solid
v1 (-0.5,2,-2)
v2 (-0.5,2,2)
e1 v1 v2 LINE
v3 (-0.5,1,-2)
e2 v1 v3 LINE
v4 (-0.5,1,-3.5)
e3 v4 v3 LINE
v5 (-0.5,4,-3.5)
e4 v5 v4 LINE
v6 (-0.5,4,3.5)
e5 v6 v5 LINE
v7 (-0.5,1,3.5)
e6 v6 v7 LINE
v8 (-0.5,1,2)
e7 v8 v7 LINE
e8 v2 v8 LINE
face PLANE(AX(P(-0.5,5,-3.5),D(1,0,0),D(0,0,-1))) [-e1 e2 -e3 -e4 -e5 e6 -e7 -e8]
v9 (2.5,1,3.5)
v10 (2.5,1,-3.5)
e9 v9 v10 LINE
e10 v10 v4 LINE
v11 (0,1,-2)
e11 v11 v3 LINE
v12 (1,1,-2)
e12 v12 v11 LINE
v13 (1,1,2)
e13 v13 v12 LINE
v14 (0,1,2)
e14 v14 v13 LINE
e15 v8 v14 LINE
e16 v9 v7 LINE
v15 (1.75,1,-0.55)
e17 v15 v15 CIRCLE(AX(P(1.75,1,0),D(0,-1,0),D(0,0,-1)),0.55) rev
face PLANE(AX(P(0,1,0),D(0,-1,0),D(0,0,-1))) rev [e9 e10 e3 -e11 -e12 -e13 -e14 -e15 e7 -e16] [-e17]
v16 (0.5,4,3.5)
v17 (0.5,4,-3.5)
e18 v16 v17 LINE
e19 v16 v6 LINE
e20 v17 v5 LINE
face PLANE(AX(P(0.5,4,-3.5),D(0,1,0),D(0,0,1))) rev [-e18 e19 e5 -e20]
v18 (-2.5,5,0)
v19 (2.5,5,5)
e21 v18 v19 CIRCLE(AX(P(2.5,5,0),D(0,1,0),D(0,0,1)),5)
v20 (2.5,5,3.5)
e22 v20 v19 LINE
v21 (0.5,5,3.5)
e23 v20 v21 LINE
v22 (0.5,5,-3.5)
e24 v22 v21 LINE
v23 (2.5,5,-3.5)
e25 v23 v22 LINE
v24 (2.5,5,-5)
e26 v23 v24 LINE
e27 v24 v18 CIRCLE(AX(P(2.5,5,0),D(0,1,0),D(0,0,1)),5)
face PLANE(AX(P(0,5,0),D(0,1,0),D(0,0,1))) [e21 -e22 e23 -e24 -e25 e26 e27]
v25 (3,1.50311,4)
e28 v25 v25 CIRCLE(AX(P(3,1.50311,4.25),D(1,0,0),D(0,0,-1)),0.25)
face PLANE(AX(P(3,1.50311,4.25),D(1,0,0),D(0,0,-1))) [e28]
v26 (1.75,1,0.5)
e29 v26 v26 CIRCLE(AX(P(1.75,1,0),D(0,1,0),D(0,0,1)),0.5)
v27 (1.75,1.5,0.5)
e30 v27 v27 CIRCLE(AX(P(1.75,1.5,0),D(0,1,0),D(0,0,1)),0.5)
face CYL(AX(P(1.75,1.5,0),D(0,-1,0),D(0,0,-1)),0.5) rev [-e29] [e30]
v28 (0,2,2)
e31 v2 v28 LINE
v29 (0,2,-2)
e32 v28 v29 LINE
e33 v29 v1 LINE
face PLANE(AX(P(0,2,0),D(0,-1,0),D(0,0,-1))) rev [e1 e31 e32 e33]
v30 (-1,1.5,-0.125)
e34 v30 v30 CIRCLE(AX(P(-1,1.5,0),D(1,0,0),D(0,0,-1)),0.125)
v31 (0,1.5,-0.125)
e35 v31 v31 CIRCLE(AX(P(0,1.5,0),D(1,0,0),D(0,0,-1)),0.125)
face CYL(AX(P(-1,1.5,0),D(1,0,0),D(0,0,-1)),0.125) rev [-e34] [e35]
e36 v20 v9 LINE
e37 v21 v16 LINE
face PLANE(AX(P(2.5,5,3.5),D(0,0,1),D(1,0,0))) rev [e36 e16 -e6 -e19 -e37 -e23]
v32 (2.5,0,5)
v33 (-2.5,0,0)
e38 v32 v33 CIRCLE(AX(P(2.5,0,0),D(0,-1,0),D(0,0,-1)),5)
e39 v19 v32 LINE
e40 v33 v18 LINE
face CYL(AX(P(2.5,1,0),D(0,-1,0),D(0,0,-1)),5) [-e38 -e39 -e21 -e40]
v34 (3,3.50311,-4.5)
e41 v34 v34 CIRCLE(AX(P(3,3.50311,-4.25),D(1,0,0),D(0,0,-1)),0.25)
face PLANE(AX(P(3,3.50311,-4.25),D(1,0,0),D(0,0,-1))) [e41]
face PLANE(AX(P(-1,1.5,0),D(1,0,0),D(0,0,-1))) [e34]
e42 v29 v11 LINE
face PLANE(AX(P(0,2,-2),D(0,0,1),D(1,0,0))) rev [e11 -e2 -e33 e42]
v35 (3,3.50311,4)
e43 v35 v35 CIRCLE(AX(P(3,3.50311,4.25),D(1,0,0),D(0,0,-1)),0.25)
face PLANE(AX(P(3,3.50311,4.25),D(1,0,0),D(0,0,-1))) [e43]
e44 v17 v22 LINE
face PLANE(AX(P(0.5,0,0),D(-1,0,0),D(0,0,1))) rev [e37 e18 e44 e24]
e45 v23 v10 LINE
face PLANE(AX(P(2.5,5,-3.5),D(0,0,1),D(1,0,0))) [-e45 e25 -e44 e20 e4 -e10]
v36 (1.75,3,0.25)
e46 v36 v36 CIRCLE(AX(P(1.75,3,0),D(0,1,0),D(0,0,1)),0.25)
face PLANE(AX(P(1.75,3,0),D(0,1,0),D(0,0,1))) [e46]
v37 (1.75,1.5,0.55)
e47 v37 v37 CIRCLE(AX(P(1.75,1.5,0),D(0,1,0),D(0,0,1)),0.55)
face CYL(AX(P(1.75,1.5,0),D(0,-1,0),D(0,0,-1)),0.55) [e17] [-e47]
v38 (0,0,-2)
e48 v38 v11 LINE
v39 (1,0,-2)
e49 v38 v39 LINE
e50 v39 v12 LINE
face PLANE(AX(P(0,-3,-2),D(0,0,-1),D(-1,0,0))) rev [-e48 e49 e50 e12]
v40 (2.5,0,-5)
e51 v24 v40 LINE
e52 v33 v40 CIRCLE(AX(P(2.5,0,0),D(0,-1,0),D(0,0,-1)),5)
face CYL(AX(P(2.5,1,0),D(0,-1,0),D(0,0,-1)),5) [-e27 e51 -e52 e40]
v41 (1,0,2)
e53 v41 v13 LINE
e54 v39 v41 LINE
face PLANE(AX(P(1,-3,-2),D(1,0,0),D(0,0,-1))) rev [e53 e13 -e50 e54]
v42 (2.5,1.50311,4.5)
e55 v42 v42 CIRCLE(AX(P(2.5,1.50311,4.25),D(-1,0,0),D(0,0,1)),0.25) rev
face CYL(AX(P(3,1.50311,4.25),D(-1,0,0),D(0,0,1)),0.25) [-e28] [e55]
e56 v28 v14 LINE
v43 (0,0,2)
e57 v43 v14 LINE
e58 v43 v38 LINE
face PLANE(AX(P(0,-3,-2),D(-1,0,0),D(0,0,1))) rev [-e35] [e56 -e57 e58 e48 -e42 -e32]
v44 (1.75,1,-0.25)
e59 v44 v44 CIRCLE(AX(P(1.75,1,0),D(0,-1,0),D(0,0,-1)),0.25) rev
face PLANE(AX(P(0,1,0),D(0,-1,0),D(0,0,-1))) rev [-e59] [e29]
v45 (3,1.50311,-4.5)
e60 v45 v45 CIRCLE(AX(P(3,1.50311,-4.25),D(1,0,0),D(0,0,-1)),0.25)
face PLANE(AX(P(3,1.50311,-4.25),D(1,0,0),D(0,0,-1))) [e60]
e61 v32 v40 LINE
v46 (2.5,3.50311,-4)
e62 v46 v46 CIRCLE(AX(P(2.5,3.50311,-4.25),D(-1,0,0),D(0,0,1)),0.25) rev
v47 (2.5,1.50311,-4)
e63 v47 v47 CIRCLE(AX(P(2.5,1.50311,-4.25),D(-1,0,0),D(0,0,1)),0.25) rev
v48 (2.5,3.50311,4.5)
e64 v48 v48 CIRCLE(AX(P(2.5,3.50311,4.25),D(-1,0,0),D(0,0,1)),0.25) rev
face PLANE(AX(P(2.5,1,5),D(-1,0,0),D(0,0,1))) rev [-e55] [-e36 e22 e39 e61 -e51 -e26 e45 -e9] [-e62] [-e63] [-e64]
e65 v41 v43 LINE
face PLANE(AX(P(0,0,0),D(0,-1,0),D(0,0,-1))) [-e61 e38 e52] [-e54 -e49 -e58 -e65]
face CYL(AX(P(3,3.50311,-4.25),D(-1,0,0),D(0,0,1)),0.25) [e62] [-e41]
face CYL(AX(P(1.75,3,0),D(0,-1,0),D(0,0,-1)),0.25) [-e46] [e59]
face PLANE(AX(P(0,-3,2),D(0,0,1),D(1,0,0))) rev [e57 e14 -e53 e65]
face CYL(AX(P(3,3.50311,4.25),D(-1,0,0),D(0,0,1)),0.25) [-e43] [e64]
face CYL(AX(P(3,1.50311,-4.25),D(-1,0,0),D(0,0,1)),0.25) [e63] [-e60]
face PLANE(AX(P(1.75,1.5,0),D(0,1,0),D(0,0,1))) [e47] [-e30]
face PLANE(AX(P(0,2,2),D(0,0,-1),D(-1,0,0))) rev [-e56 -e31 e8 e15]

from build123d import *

# Parameters (mm, degrees)
SZKIC1_W                     = 5
SZKIC1_H                     = 10
DODANIE_WYCI_GNI_CIE1_DEPTH  = 1
DODANIE_WYCI_GNI_CIE4_DEPTH  = 4
ZAOKR_GLENIE2_R              = 5
SZKIC3_W                     = 1
SZKIC3_H                     = 4
WYTNIJ_WYCI_GNI_CIE1_DEPTH   = 4
SZKIC4_W                     = 0.5
SZKIC4_H                     = 4
DODANIE_WYCI_GNI_CIE5_DEPTH  = 1
SZKIC5_R                     = 0.25
DODANIE_WYCI_GNI_CIE6_DEPTH  = 2
SZKIC6_R                     = 0.55
SZKIC6_R_2                   = 0.5
DODANIE_WYCI_GNI_CIE7_DEPTH  = 0.5
SZKIC7_W                     = 7
SZKIC7_H                     = 1
DODANIE_WYCI_GNI_CIE8_DEPTH  = 1
SZKIC11_R                    = 0.25
DODANIE_WYCI_GNI_CIE10_DEPTH = 0.5
SZKIC12_R                    = 0.125
WYTNIJ_WYCI_GNI_CIE2_DEPTH   = 1


with BuildPart() as part:
    # Szkic1 → Dodanie-wyciągnięcie1 (new body)
    with BuildSketch(Plane(origin=(0, 0, 0), x_dir=(1, 0, 0), z_dir=(0, 1, 0))):
        Rectangle(SZKIC1_W, SZKIC1_H)
    extrude(amount=DODANIE_WYCI_GNI_CIE1_DEPTH)

    # Szkic2 → Dodanie-wyciągnięcie4 (add)
    with BuildSketch(Plane(origin=(0, 1, 0), x_dir=(1, 0, 0), z_dir=(0, 1, 0))):
        Polygon((-2.5, 5), (2.5, 5), (2.5, 3.5), (-0.5, 3.5), (-0.5, -3.5), (2.5, -3.5), (2.5, -5), (-2.5, -5), align=None)
    extrude(amount=DODANIE_WYCI_GNI_CIE4_DEPTH)

    # Zaokrąglenie2
    zaokr_glenie2_edges = [part.edges().sort_by_distance(p)[0] for p in [
        (-2.5, 2.5, -5),
        (-2.5, 2.5, 5),
    ]]
    fillet(zaokr_glenie2_edges, radius=ZAOKR_GLENIE2_R - 0.0001)  # a hair under: the kernel refuses the full size

    # Szkic3 → Wytnij-wyciągnięcie1 (cut)
    with BuildSketch(Plane(origin=(0, 1, 0), x_dir=(1, 0, 0), z_dir=(0, 1, 0))):
        with Locations((0.5, 0)):
            Rectangle(SZKIC3_W, SZKIC3_H)
    extrude(amount=-WYTNIJ_WYCI_GNI_CIE1_DEPTH, mode=Mode.SUBTRACT)

    # Szkic4 → Dodanie-wyciągnięcie5 (add)
    with BuildSketch(Plane(origin=(0, 1, 0), x_dir=(1, 0, 0), z_dir=(0, 1, 0))):
        with Locations((-0.25, 0)):
            Rectangle(SZKIC4_W, SZKIC4_H)
    extrude(amount=DODANIE_WYCI_GNI_CIE5_DEPTH)

    # Szkic5 → Dodanie-wyciągnięcie6 (add)
    with BuildSketch(Plane(origin=(0, 1, 0), x_dir=(1, 0, 0), z_dir=(0, 1, 0))):
        with Locations(Location((1.75, 0, 0), (0, 0, 90))):
            Circle(SZKIC5_R)
    extrude(amount=DODANIE_WYCI_GNI_CIE6_DEPTH)

    # Szkic6 → Dodanie-wyciągnięcie7 (add)
    with BuildSketch(Plane(origin=(0, 1, 0), x_dir=(1, 0, 0), z_dir=(0, 1, 0))):
        with Locations(Location((1.75, 0, 0), (0, 0, 90))):
            Circle(SZKIC6_R)
        with Locations(Location((1.75, 0, 0), (0, 0, 270))):
            Circle(SZKIC6_R_2, mode=Mode.SUBTRACT)
    extrude(amount=DODANIE_WYCI_GNI_CIE7_DEPTH)

    # Szkic7 → Dodanie-wyciągnięcie8 (add)
    with BuildSketch(Plane(origin=(-0.5, 0, 0), x_dir=(0, 0, -1), z_dir=(1, 0, 0))):
        with Locations((0, 4.5)):
            Rectangle(SZKIC7_W, SZKIC7_H)
    extrude(amount=DODANIE_WYCI_GNI_CIE8_DEPTH)

    # Szkic11 → Dodanie-wyciągnięcie10 (add)
    with BuildSketch(Plane(origin=(2.5, 0, 0), x_dir=(0, 0, -1), z_dir=(1, 0, 0))):
        with Locations(Location((-4.25, 3.503110499, 0), (0, 0, 180))):
            Circle(SZKIC11_R)
        with Locations(Location((-4.25, 1.503110499, 0), (0, 0, 180))):
            Circle(SZKIC11_R)
        with Locations(Location((4.25, 3.503110499, 0), (0, 0, 180))):
            Circle(SZKIC11_R)
        with Locations(Location((4.25, 1.503110499, 0), (0, 0, 180))):
            Circle(SZKIC11_R)
    extrude(amount=DODANIE_WYCI_GNI_CIE10_DEPTH)

    # Szkic12 → Wytnij-wyciągnięcie2 (cut)
    with BuildSketch(Plane(origin=(0, 0, 0), x_dir=(0, 0, -1), z_dir=(1, 0, 0))):
        with Locations((0, 1.5)):
            Circle(SZKIC12_R)
    extrude(amount=-WYTNIJ_WYCI_GNI_CIE2_DEPTH, mode=Mode.SUBTRACT)


solid = part.part
